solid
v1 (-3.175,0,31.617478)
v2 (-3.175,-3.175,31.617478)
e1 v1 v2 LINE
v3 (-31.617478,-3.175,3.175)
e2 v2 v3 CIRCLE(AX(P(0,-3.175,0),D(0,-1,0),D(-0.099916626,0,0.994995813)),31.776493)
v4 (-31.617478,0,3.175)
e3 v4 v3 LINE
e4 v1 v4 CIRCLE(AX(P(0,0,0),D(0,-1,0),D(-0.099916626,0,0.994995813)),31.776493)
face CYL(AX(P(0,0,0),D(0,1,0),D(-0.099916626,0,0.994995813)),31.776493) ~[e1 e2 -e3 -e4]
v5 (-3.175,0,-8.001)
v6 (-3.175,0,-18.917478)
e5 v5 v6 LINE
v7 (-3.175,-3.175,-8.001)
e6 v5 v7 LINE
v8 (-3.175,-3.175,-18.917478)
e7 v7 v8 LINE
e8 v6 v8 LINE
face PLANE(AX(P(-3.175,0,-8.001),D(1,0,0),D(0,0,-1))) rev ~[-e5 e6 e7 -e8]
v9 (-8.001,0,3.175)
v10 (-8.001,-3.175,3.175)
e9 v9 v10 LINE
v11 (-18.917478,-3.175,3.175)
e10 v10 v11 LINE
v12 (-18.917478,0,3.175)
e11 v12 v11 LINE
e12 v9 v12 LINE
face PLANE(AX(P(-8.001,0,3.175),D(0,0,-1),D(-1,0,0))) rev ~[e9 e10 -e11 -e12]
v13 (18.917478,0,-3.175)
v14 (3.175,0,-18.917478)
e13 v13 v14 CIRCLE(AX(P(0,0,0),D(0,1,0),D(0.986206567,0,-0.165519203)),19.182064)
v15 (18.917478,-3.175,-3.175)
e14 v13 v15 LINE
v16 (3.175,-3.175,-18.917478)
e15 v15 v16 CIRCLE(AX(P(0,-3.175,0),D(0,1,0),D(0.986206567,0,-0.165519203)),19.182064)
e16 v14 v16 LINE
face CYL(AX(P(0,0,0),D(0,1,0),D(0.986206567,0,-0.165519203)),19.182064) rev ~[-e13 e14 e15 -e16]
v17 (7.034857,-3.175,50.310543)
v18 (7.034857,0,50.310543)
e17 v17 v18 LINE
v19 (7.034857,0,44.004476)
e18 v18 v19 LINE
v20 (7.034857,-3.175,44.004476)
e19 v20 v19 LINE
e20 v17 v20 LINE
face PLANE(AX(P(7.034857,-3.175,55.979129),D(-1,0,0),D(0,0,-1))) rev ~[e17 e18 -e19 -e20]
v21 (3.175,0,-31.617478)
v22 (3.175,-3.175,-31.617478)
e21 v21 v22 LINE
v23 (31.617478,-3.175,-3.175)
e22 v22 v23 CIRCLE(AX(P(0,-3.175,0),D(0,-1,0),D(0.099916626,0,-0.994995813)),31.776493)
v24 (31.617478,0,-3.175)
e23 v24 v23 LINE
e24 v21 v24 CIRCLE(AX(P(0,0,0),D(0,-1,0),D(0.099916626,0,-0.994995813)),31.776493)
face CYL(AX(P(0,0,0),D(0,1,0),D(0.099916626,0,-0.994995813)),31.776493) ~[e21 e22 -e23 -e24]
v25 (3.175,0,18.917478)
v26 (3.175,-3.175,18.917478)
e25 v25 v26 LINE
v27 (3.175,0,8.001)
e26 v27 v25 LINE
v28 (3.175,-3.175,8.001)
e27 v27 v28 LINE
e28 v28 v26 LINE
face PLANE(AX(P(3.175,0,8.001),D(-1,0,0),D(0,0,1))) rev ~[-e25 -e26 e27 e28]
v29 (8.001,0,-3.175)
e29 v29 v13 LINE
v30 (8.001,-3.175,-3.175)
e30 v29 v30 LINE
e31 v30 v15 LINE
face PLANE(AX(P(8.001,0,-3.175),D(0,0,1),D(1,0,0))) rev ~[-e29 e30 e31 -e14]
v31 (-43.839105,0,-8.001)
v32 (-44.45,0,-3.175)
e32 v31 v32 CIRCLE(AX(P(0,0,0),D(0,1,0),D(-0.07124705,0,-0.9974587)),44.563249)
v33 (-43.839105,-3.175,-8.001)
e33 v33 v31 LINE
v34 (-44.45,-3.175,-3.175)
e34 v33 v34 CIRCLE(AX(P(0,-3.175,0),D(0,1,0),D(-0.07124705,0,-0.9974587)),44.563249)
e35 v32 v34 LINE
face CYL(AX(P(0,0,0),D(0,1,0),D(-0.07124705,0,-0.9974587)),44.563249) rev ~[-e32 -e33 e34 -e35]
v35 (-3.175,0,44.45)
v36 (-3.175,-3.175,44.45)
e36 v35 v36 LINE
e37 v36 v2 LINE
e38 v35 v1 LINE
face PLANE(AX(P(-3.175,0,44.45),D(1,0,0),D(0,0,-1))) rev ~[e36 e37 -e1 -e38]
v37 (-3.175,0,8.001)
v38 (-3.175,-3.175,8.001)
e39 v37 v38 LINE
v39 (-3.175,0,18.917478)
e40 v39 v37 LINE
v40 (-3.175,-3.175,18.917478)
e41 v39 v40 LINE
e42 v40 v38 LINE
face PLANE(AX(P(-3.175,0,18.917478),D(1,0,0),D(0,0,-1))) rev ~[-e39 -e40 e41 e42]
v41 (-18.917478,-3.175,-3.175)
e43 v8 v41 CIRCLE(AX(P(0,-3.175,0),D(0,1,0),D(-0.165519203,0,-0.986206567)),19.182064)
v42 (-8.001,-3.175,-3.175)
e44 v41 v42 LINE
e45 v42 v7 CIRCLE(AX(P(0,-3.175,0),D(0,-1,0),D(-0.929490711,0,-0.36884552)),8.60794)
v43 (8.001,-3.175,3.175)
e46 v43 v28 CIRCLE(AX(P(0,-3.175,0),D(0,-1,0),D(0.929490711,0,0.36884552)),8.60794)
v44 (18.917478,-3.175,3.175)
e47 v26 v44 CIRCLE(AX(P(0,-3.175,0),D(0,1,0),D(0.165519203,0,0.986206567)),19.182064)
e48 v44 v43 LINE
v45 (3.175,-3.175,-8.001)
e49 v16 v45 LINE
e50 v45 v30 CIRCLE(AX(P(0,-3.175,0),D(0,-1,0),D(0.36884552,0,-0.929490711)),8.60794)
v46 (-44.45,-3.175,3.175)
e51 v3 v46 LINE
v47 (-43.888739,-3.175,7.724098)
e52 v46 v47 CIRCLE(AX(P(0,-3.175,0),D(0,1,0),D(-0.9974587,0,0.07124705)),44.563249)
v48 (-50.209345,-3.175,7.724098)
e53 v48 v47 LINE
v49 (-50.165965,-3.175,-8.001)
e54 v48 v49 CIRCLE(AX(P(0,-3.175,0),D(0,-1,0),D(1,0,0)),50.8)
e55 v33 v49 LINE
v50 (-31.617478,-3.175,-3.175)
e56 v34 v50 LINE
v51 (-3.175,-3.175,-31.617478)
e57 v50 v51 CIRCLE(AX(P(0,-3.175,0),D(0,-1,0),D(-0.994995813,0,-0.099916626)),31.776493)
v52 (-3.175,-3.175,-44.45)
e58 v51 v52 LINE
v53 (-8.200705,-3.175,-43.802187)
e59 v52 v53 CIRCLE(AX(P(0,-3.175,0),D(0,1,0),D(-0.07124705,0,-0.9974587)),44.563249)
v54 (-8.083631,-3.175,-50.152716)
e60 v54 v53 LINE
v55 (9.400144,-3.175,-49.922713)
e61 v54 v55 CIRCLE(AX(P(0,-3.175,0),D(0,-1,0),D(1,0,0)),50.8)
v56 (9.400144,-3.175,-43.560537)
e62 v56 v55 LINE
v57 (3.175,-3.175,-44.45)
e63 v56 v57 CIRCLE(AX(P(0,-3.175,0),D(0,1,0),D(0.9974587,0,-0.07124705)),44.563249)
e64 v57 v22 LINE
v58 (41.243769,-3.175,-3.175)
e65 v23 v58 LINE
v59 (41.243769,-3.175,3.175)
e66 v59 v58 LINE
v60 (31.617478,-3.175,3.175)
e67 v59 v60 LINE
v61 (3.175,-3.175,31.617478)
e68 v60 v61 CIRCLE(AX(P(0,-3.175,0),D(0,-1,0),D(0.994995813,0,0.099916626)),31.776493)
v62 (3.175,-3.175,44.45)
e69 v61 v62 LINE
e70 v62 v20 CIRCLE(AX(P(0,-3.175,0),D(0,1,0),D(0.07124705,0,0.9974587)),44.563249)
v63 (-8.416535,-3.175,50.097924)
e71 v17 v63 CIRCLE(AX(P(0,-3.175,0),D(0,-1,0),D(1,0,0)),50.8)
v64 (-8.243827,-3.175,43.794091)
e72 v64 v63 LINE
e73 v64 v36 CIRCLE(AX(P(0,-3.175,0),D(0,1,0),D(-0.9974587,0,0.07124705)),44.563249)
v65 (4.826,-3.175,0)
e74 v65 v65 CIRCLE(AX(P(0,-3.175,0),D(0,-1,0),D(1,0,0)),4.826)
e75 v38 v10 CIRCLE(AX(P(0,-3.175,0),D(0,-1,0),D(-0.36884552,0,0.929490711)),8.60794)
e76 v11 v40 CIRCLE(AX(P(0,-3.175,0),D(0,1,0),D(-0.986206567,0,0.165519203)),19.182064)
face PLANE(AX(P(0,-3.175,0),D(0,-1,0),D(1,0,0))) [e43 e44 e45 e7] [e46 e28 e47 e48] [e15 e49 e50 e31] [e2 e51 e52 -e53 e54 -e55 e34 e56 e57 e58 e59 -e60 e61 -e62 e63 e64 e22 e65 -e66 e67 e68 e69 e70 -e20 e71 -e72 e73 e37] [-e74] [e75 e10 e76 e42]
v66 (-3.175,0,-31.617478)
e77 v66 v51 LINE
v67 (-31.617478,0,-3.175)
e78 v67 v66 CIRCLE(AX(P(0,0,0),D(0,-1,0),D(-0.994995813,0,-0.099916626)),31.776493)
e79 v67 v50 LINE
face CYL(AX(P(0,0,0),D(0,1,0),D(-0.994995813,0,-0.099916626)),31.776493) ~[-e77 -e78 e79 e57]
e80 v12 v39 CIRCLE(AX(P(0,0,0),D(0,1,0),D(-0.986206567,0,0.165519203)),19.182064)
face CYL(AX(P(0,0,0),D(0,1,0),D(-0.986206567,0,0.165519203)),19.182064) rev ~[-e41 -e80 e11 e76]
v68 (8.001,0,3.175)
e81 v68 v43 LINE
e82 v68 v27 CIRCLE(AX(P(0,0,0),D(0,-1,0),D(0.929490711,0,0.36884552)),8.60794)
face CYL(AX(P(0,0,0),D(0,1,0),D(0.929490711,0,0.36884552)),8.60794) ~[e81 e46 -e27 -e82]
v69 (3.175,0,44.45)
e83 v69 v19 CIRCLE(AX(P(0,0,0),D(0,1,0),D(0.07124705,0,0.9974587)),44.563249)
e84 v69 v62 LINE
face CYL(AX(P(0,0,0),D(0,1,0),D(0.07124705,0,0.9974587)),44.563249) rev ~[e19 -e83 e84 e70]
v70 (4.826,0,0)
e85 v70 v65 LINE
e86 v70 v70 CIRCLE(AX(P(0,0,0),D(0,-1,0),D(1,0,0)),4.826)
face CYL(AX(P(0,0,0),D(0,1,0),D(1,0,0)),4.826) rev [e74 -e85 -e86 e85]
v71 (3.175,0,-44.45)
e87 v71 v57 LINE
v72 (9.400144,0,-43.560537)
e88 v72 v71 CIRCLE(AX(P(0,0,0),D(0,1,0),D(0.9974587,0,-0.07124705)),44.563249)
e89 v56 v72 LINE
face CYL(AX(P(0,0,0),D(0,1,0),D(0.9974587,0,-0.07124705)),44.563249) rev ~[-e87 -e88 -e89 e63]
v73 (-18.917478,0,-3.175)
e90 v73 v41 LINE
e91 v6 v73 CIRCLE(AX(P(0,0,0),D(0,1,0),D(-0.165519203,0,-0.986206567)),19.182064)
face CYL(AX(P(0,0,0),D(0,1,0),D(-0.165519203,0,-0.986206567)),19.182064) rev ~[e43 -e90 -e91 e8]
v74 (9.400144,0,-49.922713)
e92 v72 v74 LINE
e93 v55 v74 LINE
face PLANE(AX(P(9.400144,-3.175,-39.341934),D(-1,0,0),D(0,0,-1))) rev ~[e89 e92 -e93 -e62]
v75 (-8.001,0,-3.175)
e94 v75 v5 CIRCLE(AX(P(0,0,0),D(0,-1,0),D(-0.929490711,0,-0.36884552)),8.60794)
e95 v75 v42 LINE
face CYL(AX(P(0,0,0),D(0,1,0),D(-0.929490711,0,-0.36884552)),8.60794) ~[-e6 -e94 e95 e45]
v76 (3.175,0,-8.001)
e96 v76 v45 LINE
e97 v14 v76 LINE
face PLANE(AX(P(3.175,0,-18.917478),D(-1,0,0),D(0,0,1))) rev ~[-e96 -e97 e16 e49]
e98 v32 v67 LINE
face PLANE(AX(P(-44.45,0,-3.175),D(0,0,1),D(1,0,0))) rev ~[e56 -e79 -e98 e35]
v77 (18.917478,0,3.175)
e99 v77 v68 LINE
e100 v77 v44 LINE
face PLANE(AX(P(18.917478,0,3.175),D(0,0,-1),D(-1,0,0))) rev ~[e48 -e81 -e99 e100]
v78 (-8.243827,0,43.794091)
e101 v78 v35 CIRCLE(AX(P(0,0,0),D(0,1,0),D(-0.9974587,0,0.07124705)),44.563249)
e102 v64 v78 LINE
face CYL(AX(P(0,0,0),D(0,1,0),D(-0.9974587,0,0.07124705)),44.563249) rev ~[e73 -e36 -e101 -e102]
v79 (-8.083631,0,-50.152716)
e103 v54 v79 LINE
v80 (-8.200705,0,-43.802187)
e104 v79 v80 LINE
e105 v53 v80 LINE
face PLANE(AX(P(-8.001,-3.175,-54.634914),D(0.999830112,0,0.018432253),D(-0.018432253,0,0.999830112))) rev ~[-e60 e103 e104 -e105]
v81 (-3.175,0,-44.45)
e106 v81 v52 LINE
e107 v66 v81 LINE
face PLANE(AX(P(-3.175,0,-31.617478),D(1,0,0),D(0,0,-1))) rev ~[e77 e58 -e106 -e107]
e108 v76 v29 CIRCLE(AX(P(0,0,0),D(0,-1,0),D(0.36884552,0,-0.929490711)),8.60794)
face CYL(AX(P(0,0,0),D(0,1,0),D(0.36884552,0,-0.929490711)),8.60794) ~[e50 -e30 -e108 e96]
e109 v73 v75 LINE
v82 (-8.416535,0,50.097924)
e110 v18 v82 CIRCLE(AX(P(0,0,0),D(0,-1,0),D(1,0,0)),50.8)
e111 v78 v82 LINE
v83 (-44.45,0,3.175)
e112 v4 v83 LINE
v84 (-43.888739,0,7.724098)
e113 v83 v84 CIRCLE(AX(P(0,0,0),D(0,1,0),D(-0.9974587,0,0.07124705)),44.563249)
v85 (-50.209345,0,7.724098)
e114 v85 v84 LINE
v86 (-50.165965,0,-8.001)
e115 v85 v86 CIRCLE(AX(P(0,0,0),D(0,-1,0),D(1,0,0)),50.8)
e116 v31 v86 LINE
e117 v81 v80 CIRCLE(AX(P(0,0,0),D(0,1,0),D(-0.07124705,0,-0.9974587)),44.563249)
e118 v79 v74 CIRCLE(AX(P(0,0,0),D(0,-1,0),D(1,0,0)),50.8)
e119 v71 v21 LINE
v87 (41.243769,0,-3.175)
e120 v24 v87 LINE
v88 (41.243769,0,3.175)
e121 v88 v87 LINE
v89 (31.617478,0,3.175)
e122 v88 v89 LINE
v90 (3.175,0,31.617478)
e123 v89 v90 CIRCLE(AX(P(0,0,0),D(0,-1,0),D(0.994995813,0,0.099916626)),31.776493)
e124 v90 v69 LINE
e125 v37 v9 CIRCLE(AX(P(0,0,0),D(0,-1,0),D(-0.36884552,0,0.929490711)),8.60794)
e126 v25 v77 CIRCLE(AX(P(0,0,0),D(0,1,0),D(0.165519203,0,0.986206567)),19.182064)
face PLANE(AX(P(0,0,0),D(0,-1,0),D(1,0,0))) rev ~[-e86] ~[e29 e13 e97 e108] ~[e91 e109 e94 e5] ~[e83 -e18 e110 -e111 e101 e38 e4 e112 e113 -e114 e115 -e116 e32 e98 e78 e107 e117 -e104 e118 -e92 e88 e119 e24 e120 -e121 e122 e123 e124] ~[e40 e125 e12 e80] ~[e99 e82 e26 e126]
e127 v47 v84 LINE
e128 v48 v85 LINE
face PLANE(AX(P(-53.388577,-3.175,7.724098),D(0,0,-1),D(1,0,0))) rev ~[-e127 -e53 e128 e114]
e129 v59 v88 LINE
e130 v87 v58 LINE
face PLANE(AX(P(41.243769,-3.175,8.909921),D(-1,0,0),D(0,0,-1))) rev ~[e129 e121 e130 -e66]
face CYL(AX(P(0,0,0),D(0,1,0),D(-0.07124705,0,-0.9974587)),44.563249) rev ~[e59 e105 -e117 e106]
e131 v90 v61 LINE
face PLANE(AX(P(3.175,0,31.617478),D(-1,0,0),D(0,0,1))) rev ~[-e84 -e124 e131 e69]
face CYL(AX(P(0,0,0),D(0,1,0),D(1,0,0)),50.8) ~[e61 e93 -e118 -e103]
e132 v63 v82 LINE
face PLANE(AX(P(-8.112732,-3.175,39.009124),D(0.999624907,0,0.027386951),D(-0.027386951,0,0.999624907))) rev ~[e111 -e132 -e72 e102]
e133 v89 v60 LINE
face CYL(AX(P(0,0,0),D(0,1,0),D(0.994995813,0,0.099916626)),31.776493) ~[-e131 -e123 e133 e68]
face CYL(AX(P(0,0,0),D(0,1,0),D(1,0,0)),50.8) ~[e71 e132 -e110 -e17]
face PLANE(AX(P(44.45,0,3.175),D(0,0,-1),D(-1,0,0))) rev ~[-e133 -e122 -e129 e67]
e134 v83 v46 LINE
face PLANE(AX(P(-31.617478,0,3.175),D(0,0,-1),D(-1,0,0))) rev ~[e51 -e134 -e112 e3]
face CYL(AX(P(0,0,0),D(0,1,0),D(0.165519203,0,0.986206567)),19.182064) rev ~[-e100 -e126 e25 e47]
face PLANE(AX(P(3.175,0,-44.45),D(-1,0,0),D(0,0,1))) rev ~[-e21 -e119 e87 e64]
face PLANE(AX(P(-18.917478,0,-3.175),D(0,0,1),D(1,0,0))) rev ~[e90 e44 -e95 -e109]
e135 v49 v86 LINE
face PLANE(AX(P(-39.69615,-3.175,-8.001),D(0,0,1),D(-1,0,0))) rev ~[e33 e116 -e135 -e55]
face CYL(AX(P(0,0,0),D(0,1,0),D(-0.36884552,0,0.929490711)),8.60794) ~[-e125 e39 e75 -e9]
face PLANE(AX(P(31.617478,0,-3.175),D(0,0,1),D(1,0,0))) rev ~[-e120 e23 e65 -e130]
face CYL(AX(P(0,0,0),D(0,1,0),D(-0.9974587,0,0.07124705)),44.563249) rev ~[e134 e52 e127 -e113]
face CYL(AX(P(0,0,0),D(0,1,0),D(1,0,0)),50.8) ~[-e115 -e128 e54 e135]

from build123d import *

# Parameters (mm, degrees)
F0_R     = 50.8
F0_R_2   = 4.826
F1_DEPTH = 3.175
F3_DEPTH = 25.4


with BuildPart() as f1:
    # F0 (on Front) → F1 (new body)
    with BuildSketch(Plane.XZ):
        Circle(F0_R)
        with BuildLine():
            Line((-3.175, -31.6174778593), (-3.175, -44.45))
            ThreePointArc((-3.175, -44.45), (-31.5109752705, -31.5109752705), (-44.45, -3.175))
            Line((-44.45, -3.175), (-31.6174778593, -3.175))
            ThreePointArc((-31.6174778593, -3.175), (-22.4693739475, -22.4693739475), (-3.175, -31.6174778593))
        make_face(mode=Mode.SUBTRACT)
        with BuildLine():
            ThreePointArc((-8.001, -3.175), (-6.0867325389, -6.0867325389), (-3.175, -8.001))
            Line((-3.175, -8.001), (-3.175, -18.9174778593))
            ThreePointArc((-3.175, -18.9174778593), (-13.5637677944, -13.5637677944), (-18.9174778593, -3.175))
            Line((-18.9174778593, -3.175), (-8.001, -3.175))
        make_face(mode=Mode.SUBTRACT)
        Circle(F0_R_2, mode=Mode.SUBTRACT)
        with BuildLine():
            Line((31.6174778593, -3.175), (44.45, -3.175))
            ThreePointArc((44.45, -3.175), (31.5109752705, -31.5109752705), (3.175, -44.45))
            Line((3.175, -44.45), (3.175, -31.6174778593))
            ThreePointArc((3.175, -31.6174778593), (22.4693739475, -22.4693739475), (31.6174778593, -3.175))
        make_face(mode=Mode.SUBTRACT)
        with BuildLine():
            ThreePointArc((3.175, -8.001), (6.0867325389, -6.0867325389), (8.001, -3.175))
            Line((8.001, -3.175), (18.9174778593, -3.175))
            ThreePointArc((18.9174778593, -3.175), (13.5637677944, -13.5637677944), (3.175, -18.9174778593))
            Line((3.175, -18.9174778593), (3.175, -8.001))
        make_face(mode=Mode.SUBTRACT)
        with BuildLine():
            Line((-3.175, 18.9174778593), (-3.175, 8.001))
            ThreePointArc((-3.175, 8.001), (-6.0867325389, 6.0867325389), (-8.001, 3.175))
            Line((-8.001, 3.175), (-18.9174778593, 3.175))
            ThreePointArc((-18.9174778593, 3.175), (-13.5637677944, 13.5637677944), (-3.175, 18.9174778593))
        make_face(mode=Mode.SUBTRACT)
        with BuildLine():
            ThreePointArc((-44.45, 3.175), (-31.5109752705, 31.5109752705), (-3.175, 44.45))
            Line((-3.175, 44.45), (-3.175, 37.9674778593))
            Line((-3.175, 37.9674778593), (-3.175, 31.6174778593))
            ThreePointArc((-3.175, 31.6174778593), (-22.4693739475, 22.4693739475), (-31.6174778593, 3.175))
            Line((-31.6174778593, 3.175), (-44.45, 3.175))
        make_face(mode=Mode.SUBTRACT)
        with BuildLine():
            ThreePointArc((8.001, 3.175), (6.0867325389, 6.0867325389), (3.175, 8.001))
            Line((3.175, 8.001), (3.175, 18.9174778593))
            ThreePointArc((3.175, 18.9174778593), (13.5637677944, 13.5637677944), (18.9174778593, 3.175))
            Line((18.9174778593, 3.175), (8.001, 3.175))
        make_face(mode=Mode.SUBTRACT)
        with BuildLine():
            Line((3.175, 37.9674778593), (3.175, 44.45))
            ThreePointArc((3.175, 44.45), (31.5109752705, 31.5109752705), (44.45, 3.175))
            Line((44.45, 3.175), (31.6174778593, 3.175))
            ThreePointArc((31.6174778593, 3.175), (22.4693739475, 22.4693739475), (3.175, 31.6174778593))
            Line((3.175, 31.6174778593), (3.175, 37.9674778593))
        make_face(mode=Mode.SUBTRACT)
    extrude(amount=F1_DEPTH)

    # F2 (on face) → F3 (cut)
    with BuildSketch(Plane.XZ.offset(3.175)):
        Polygon((-39.8937948048, 44.5096977055), (-53.3885769546, 7.7240979299), (-39.592076093, 7.7240979299), (-8.112732321, 39.0091240406), (-8.5013657808, 53.1942620873), align=None)
        Polygon((7.0348572917, 55.979128927), (7.0348572917, 38.4760089219), (40.1488728821, 8.9099211618), (41.2437692285, 8.9099211618), (41.2437692285, 11.4161195233), (53.2457668566, 13.9619985828), (46.2986193597, 36.3472476602), align=None)
        Polygon((41.2437692285, 11.4161195233), (41.2437692285, 8.9099211618), (54.8136532307, 8.9099211618), (53.2457668566, 13.9619985828), align=None)
        Polygon((54.8136532307, 8.9099211618), (41.2437692285, 8.9099211618), (41.2437692285, -6.7063555237), (56.2328249216, -6.7009725608), (55.2191524148, -9.5701087266), (60.481145978, -9.5701087266), (60.481145978, 15.4967764392), (53.2457668566, 13.9619985828), align=None)
        Polygon((41.2437692285, -9.5701087266), (41.2437692285, -6.7063555237), (39.6758913994, -6.7069185898), (9.4001442194, -39.3419340253), (9.4001442194, -54.716296494), (44.45, -40.0515161455), (55.2191524148, -9.5701087266), align=None)
        Polygon((56.2328249216, -6.7009725608), (41.2437692285, -6.7063555237), (41.2437692285, -9.5701087266), (55.2191524148, -9.5701087266), align=None)
        Polygon((-8.001, -54.6349138021), (-8.3070490509, -38.0337389297), (-39.696149528, -8.001), (-54.2215406895, -8.001), (-44.45, -37.7750843763), align=None)
    extrude(amount=-F3_DEPTH, mode=Mode.SUBTRACT)


solid = f1.part
